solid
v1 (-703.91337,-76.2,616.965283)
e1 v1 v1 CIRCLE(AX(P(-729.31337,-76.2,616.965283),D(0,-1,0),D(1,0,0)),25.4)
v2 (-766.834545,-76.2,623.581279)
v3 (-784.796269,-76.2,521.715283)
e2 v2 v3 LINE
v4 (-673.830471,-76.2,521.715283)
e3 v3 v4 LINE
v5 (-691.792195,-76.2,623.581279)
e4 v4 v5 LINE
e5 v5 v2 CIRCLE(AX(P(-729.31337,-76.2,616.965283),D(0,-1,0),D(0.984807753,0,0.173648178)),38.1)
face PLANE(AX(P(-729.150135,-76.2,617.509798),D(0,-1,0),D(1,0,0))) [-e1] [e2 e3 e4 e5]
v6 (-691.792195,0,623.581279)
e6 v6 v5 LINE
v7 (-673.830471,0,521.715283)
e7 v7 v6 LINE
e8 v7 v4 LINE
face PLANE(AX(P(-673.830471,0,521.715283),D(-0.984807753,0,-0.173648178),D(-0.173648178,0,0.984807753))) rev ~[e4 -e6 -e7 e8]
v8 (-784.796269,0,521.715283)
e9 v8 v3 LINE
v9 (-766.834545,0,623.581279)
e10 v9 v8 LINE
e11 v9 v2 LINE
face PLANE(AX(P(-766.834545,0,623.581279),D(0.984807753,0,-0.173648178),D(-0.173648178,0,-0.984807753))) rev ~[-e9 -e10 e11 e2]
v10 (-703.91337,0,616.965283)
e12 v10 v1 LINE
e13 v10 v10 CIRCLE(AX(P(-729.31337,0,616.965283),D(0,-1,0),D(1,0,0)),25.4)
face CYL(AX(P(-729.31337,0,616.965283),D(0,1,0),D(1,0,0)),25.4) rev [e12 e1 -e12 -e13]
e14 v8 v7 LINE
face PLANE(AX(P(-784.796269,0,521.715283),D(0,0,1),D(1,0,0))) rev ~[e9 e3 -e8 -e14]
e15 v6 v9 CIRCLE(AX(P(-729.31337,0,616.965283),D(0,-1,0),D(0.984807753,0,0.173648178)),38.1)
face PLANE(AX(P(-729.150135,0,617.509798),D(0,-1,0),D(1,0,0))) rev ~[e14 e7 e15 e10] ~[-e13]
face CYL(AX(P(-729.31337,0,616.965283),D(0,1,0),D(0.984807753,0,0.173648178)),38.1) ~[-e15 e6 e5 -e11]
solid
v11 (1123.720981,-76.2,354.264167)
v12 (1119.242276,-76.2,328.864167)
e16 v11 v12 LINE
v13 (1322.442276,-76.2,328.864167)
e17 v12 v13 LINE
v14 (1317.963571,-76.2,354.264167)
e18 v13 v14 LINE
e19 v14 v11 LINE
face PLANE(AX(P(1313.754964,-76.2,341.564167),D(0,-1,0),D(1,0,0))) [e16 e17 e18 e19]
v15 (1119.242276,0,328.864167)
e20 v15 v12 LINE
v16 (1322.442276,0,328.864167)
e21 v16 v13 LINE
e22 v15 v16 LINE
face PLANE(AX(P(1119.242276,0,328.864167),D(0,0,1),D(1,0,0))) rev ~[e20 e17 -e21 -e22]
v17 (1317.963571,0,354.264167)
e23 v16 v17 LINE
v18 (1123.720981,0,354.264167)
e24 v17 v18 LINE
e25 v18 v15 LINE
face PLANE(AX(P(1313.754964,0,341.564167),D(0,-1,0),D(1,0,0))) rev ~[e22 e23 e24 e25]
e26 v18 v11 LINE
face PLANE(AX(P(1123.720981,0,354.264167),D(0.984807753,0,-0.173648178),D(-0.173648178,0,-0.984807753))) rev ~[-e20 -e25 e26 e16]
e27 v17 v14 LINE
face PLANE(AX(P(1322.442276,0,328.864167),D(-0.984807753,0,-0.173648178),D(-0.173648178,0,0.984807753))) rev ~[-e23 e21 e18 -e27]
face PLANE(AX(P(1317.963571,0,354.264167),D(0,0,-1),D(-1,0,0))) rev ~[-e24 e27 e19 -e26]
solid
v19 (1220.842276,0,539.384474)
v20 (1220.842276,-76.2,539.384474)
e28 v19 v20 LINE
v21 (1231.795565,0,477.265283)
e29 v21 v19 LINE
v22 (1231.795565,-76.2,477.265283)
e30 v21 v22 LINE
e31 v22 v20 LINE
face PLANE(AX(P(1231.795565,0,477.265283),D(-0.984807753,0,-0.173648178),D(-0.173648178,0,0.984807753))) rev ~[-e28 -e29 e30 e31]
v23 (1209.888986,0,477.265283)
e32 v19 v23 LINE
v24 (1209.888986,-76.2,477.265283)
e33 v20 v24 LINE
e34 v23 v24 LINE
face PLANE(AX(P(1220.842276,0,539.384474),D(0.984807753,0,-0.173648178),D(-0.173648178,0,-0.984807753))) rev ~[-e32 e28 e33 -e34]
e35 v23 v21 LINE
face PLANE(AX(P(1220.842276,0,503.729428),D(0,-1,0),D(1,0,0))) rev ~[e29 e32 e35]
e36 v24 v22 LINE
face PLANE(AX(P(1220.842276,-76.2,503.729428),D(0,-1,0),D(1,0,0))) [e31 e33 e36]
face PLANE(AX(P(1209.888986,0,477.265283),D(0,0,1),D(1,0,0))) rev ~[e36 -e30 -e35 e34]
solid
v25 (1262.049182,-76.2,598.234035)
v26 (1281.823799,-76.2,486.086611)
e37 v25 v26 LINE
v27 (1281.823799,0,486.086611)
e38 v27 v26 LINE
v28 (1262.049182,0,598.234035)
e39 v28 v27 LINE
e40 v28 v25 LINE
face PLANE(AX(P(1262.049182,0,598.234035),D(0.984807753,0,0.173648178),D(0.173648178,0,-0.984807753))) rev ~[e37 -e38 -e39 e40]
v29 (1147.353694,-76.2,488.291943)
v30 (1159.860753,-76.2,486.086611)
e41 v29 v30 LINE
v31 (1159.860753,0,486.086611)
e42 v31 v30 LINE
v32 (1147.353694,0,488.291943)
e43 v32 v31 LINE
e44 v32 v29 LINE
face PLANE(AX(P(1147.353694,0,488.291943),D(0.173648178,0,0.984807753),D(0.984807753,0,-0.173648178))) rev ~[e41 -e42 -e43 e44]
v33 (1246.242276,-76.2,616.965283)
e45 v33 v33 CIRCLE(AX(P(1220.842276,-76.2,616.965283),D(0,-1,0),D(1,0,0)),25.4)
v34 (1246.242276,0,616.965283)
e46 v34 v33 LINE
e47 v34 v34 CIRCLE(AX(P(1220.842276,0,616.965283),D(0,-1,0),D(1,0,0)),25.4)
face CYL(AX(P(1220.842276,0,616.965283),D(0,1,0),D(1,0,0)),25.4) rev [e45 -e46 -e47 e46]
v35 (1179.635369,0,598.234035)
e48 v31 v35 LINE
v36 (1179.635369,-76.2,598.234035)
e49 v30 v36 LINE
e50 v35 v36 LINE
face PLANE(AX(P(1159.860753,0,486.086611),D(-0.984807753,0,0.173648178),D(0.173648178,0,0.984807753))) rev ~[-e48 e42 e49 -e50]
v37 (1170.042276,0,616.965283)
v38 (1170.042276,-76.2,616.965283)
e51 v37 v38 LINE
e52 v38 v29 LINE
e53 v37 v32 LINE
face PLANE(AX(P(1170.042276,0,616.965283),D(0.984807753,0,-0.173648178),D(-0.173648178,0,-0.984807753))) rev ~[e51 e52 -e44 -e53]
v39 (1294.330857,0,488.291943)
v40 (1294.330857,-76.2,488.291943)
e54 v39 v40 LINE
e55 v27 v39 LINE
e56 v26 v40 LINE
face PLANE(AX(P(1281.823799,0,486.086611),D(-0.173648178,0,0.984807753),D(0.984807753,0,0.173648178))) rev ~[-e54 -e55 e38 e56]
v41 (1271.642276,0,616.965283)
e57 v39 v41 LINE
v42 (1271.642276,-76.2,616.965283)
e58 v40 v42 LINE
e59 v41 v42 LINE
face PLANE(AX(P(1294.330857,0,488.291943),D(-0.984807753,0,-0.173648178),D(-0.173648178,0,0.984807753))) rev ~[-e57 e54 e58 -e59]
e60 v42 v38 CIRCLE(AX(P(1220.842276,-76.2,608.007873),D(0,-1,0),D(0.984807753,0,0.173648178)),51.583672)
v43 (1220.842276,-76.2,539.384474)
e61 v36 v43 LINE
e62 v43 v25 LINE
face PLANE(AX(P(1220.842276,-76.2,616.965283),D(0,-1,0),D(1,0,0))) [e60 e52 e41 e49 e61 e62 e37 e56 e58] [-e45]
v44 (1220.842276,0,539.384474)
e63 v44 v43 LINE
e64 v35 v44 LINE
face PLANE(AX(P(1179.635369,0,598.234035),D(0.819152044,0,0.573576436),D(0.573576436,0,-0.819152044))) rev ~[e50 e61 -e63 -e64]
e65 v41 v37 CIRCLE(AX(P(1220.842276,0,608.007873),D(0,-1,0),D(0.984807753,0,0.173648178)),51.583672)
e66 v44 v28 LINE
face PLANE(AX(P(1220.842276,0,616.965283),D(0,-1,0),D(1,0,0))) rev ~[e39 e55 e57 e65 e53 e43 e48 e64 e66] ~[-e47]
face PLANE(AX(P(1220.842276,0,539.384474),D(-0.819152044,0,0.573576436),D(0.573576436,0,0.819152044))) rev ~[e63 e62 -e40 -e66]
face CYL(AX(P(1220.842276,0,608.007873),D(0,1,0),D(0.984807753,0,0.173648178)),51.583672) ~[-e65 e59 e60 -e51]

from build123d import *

# Parameters (mm, degrees)
F1_R     = 25.4
F2_DEPTH = 76.2


with BuildPart() as f2:
    # F1 (on Front) → F2 (new body)
    with BuildSketch(Plane.XZ):
        with BuildLine():
            ThreePointArc((1182.7422758102, 616.9652833939), (1220.8422758102, 578.8652833939), (1258.9422758102, 616.9652833939))
            ThreePointArc((1258.9422758102, 616.9652833939), (1220.8422758102, 655.0652833939), (1182.7422758102, 616.9652833939))
        make_face()
        with Locations((1220.8422758102, 616.9652833939)):
            Circle(F1_R, mode=Mode.SUBTRACT)
        with BuildLine():
            ThreePointArc((1182.7422758102, 616.9652833939), (1220.8422758102, 655.0652833939), (1258.9422758102, 616.9652833939))
            Line((1258.9422758102, 616.9652833939), (1271.6422758102, 616.9652833939))
            ThreePointArc((1271.6422758102, 616.9652833939), (1220.8422758102, 659.5915446577), (1170.0422758102, 616.9652833939))
            Line((1170.0422758102, 616.9652833939), (1182.7422758102, 616.9652833939))
        make_face()
        with BuildLine():
            Line((1271.6422758102, 616.9652833939), (1258.9422758102, 616.9652833939))
            ThreePointArc((1258.9422758102, 616.9652833939), (1220.8422758102, 578.8652833939), (1182.7422758102, 616.9652833939))
            Line((1182.7422758102, 616.9652833939), (1170.0422758102, 616.9652833939))
            Line((1170.0422758102, 616.9652833939), (1147.3536941437, 488.2919426757))
            Line((1147.3536941437, 488.2919426757), (1159.860752607, 486.0866108193))
            Line((1159.860752607, 486.0866108193), (1179.6353693827, 598.2340354293))
            Line((1179.6353693827, 598.2340354293), (1220.8422758102, 539.3844741508))
            Line((1220.8422758102, 539.3844741508), (1262.0491822378, 598.2340354293))
            Line((1262.0491822378, 598.2340354293), (1281.8237990135, 486.0866108193))
            Line((1281.8237990135, 486.0866108193), (1294.3308574767, 488.2919426757))
            Line((1294.3308574767, 488.2919426757), (1271.6422758102, 616.9652833939))
        make_face()
    extrude(amount=F2_DEPTH)


with BuildPart() as f2b:
    # F1 (on Front) → F2, piece 2 (new body)
    with BuildSketch(Plane.XZ):
        Polygon((1317.9635705002, 354.2641669573), (1305.0676525293, 354.2641669573), (1309.5463578393, 328.8641669573), (1322.4422758102, 328.8641669573), align=None)
        Polygon((1309.5463578393, 328.8641669573), (1305.0676525293, 354.2641669573), (1253.4839806455, 354.2641669573), (1257.9626859555, 328.8641669573), align=None)
        Polygon((1188.200570975, 354.2641669573), (1136.6168990912, 354.2641669573), (1132.1381937812, 328.8641669573), (1183.721865665, 328.8641669573), align=None)
        Polygon((1132.1381937812, 328.8641669573), (1136.6168990912, 354.2641669573), (1123.7209811202, 354.2641669573), (1119.2422758102, 328.8641669573), align=None)
        Polygon((1257.9626859555, 328.8641669573), (1253.4839806455, 354.2641669573), (1188.200570975, 354.2641669573), (1183.721865665, 328.8641669573), align=None)
    extrude(amount=F2_DEPTH)


with BuildPart() as f2c:
    # F1 (on Front) → F2, piece 3 (new body)
    with BuildSketch(Plane.XZ):
        Polygon((1209.88898646, 477.2652833939), (1231.7955651605, 477.2652833939), (1220.8422758102, 539.3844741508), align=None)
    extrude(amount=F2_DEPTH)


with BuildPart() as f2d:
    # F1 (on Front) → F2, piece 4 (new body)
    with BuildSketch(Plane.XZ):
        with BuildLine():
            ThreePointArc((-766.8345454561, 623.581278963), (-732.634003865, 579.0102653966), (-691.2133700663, 616.9652833939))
            ThreePointArc((-691.2133700663, 616.9652833939), (-691.358352069, 620.2859171925), (-691.7921946765, 623.581278963))
            ThreePointArc((-691.7921946765, 623.581278963), (-729.3133700663, 655.0652833939), (-766.8345454561, 623.581278963))
        make_face()
        with Locations((-729.3133700663, 616.9652833939)):
            Circle(F1_R, mode=Mode.SUBTRACT)
        with BuildLine():
            ThreePointArc((-691.7921946765, 623.581278963), (-691.358352069, 620.2859171925), (-691.2133700663, 616.9652833939))
            ThreePointArc((-691.2133700663, 616.9652833939), (-732.634003865, 579.0102653966), (-766.8345454561, 623.581278963))
            Line((-766.8345454561, 623.581278963), (-784.7962688916, 521.7152833939))
            Line((-784.7962688916, 521.7152833939), (-673.830471241, 521.7152833939))
            Line((-673.830471241, 521.7152833939), (-691.7921946765, 623.581278963))
        make_face()
    extrude(amount=F2_DEPTH)


solid = Compound([f2.part, f2b.part, f2c.part, f2d.part])
